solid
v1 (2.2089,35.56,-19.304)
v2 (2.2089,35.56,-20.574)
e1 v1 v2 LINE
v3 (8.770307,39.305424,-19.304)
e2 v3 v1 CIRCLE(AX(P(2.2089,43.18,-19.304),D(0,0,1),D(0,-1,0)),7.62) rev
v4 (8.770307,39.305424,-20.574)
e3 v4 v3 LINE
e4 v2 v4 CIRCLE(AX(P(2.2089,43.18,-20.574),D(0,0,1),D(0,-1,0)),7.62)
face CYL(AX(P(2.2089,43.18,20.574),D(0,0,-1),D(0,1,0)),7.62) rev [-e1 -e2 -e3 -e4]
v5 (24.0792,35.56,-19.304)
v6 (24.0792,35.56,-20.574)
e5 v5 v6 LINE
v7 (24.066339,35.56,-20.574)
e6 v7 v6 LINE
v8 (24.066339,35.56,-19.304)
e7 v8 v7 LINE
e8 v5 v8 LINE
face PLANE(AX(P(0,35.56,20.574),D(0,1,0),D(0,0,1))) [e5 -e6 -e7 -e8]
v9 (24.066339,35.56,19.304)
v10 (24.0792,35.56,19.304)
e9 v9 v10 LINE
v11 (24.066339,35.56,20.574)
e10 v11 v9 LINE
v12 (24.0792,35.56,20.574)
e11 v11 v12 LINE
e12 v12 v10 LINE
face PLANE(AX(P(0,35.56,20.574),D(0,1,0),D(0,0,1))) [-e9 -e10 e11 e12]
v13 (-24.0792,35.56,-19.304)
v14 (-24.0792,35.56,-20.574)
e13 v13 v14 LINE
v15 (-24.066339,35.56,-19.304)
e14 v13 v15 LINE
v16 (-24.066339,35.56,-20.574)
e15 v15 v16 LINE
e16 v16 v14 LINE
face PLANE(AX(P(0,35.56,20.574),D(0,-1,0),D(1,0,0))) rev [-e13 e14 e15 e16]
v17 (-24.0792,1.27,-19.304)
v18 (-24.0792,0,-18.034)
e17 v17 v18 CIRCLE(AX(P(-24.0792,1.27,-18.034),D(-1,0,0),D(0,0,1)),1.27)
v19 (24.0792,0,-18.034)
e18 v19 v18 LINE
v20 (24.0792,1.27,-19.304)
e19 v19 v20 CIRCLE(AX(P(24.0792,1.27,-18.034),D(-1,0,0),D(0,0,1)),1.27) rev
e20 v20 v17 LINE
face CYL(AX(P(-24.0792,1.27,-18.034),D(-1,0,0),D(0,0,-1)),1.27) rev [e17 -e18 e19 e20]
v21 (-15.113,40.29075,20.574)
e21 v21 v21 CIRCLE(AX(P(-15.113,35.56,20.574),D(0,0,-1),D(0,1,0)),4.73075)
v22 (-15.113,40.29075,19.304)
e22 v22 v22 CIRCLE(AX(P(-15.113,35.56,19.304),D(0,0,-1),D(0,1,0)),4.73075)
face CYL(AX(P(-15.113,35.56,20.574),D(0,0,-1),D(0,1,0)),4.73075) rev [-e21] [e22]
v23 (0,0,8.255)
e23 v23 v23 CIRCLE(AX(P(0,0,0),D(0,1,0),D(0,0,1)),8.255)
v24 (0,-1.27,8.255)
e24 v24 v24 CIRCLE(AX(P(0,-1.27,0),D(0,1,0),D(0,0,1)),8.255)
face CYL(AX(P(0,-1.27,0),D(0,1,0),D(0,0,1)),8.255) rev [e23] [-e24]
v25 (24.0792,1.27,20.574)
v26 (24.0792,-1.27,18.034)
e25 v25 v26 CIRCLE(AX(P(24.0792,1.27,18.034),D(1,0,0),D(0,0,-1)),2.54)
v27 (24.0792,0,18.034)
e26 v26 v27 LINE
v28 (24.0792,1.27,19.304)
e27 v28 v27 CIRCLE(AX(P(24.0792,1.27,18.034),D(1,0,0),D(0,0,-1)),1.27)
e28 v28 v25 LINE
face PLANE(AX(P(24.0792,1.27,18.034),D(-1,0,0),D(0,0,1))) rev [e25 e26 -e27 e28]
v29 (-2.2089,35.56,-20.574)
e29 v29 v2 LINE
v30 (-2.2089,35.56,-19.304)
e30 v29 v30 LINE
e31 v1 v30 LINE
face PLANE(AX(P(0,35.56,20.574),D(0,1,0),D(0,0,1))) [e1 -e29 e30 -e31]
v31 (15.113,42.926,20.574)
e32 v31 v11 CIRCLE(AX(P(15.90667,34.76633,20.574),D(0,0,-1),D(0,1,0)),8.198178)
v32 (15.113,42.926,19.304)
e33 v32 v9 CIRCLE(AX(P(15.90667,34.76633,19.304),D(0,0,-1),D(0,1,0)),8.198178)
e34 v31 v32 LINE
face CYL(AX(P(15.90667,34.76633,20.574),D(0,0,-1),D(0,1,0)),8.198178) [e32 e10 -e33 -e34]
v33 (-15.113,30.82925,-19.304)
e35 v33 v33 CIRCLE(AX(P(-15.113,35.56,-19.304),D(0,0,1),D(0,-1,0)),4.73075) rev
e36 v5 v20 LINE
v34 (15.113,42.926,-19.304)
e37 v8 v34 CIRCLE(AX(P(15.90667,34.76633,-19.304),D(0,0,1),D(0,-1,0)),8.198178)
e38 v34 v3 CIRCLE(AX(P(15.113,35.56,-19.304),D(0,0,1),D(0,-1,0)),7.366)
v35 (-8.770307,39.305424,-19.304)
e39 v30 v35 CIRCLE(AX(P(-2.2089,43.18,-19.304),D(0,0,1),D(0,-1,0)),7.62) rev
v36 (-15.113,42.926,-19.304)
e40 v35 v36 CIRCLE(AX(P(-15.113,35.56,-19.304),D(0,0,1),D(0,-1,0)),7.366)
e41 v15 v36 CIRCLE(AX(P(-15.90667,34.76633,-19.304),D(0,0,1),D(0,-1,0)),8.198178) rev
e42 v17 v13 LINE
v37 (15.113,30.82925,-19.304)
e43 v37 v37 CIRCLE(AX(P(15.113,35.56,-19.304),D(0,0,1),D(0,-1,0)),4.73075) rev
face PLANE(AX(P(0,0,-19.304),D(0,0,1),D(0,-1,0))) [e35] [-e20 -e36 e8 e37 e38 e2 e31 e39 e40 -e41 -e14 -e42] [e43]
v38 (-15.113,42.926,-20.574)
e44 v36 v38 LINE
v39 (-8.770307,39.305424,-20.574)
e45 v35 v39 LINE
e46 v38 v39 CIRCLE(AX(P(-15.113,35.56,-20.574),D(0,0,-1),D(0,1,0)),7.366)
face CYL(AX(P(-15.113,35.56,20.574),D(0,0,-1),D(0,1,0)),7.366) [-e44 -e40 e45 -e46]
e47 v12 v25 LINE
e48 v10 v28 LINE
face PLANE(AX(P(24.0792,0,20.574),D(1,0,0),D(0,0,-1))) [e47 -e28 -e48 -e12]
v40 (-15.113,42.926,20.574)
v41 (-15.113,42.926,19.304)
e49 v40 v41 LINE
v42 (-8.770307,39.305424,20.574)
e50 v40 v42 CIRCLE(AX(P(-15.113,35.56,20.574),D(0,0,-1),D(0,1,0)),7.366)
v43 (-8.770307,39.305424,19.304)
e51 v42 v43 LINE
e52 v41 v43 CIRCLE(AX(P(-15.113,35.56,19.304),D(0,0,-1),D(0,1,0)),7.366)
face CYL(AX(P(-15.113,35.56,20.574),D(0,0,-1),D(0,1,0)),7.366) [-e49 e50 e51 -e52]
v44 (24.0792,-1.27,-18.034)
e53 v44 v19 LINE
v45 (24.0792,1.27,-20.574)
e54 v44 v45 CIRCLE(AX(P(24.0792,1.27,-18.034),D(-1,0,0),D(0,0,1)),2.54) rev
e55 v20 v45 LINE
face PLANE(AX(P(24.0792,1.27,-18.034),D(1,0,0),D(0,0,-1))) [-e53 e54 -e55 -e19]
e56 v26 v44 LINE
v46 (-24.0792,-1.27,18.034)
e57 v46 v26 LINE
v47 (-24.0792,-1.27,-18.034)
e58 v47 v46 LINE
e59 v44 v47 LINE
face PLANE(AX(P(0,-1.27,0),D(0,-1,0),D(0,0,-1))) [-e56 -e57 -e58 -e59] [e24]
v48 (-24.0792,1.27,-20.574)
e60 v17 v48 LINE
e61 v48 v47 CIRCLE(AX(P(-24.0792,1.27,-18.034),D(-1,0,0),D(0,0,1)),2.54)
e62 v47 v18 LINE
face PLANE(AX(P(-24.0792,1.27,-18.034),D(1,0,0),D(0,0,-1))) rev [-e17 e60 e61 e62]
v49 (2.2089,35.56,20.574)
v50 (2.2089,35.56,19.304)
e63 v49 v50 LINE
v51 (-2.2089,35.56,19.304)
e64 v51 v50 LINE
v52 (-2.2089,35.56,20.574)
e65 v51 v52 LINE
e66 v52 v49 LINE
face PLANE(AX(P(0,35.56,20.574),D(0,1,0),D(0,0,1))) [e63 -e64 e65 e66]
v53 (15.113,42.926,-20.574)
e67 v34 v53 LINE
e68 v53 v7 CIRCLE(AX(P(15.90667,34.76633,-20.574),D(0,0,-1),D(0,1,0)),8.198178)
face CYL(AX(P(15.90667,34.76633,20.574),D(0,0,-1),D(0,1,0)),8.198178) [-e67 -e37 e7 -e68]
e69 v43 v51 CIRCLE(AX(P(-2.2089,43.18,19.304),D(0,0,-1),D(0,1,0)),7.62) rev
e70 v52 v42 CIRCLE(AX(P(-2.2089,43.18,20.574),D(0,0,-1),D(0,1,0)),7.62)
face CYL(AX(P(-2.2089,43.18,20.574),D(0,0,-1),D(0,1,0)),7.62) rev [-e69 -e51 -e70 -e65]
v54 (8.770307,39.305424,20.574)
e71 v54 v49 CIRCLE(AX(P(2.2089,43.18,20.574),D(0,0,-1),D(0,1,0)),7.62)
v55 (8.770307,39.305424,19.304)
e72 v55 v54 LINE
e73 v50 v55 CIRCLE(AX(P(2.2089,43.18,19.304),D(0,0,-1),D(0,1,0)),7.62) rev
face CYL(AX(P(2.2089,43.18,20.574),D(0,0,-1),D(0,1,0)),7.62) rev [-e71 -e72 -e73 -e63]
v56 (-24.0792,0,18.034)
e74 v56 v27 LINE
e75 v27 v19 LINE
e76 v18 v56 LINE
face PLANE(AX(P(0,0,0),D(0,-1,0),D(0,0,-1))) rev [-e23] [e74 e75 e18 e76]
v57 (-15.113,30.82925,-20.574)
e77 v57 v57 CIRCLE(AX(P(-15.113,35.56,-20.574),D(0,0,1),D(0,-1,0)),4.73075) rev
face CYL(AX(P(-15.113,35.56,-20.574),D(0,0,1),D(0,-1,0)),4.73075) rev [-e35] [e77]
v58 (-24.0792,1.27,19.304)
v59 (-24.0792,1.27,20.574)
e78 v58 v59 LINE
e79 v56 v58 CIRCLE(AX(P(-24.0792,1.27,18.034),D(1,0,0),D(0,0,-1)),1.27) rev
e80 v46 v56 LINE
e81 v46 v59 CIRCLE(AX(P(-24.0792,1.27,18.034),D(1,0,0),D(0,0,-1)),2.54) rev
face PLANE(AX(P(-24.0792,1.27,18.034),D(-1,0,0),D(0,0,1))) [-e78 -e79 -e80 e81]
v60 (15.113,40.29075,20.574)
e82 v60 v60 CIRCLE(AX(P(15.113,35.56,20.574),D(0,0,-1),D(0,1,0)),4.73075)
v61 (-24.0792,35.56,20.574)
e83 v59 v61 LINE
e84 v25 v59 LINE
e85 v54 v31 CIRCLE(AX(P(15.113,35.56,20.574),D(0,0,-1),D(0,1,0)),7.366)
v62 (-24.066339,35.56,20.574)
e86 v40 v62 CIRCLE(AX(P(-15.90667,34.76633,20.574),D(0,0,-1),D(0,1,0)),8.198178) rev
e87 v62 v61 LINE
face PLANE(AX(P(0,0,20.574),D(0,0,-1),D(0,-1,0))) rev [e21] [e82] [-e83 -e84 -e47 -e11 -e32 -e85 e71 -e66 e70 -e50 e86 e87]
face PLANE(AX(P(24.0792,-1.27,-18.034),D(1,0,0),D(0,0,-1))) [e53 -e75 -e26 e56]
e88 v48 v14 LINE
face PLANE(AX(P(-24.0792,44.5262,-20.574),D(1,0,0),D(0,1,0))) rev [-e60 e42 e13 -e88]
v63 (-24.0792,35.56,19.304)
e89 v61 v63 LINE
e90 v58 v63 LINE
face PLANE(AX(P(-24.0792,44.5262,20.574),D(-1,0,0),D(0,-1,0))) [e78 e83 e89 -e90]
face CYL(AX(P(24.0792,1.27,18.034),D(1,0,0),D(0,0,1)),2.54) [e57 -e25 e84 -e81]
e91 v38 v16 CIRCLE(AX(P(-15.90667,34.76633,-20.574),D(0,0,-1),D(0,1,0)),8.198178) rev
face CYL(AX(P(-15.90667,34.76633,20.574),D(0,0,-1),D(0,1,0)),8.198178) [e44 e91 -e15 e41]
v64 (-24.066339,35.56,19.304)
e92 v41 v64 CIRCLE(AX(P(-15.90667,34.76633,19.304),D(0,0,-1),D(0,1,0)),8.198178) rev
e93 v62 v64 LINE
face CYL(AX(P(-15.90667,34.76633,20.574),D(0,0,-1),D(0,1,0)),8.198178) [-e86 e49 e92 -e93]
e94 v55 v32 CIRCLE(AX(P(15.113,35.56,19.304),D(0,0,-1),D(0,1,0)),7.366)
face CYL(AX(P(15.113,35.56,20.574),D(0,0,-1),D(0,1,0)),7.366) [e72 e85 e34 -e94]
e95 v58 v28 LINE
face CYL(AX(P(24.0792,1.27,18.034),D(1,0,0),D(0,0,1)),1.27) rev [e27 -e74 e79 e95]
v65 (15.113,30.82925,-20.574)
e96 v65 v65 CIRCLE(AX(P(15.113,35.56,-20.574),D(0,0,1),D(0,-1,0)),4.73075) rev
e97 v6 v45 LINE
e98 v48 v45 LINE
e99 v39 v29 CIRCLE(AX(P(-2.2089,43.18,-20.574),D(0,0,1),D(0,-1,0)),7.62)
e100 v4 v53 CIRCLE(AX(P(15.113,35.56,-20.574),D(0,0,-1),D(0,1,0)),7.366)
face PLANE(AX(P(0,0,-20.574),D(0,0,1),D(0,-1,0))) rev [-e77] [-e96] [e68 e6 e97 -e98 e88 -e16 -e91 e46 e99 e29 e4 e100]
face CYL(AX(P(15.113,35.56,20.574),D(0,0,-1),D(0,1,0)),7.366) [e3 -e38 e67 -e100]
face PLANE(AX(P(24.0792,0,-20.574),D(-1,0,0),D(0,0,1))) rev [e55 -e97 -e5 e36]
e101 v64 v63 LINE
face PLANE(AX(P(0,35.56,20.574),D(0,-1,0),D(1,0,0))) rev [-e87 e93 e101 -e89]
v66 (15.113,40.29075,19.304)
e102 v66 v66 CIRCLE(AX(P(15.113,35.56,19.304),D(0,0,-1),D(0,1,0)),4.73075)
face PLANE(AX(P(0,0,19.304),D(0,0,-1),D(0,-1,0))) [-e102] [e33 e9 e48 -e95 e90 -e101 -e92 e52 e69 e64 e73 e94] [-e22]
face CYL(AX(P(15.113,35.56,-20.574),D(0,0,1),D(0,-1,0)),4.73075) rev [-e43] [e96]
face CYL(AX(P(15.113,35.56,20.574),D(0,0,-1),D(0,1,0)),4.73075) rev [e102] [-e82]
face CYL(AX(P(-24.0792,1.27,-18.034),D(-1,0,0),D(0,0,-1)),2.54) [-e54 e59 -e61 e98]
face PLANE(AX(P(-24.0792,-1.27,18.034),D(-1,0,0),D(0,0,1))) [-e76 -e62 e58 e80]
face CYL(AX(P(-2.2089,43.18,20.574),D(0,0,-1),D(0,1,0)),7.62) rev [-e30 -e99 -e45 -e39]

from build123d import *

# Parameters (mm, degrees)
SKETCH1_W               = 48.1584
SKETCH1_H               = 36.068
SKETCH1_R               = 8.255
BASE_FLANGE1_DEPTH      = 1.27
EDGE_FLANGE1_DEPTH      = 48.1584
EDGE_FLANGE1_START      = 1.27
EDGE_FLANGE1_PROFILE_W  = 48.1584
EDGE_FLANGE1_PROFILE_H  = 43.2562
EDGE_FLANGE1_PROFILE_R  = 4.73075
EDGE_FLANGE1_FLAT_DEPTH = 1.27
CUT_EXTRUDE7_DEPTH      = 66.234563408
FILLET2_R               = 7.62


# Sheet-metal steps are written as plain solids
with BuildPart() as part:
    # Sketch1 → Base-Flange1 (new body)
    with BuildSketch(Plane(origin=(0, 0, 0), x_dir=(1, 0, 0), z_dir=(0, 1, 0))):
        Rectangle(SKETCH1_W, SKETCH1_H)
        with Locations(Location((0, 0, 0), (0, 0, 270))):
            Circle(SKETCH1_R, mode=Mode.SUBTRACT)
    extrude(amount=-BASE_FLANGE1_DEPTH)

    # Edge-Flange1 bend section (across the edge) → Edge-Flange1 (add)
    with BuildSketch(Plane(origin=(24.0792, 0, -19.304), x_dir=(0, 0, 1), z_dir=(-1, 0, 0))):
        with BuildLine():
            Line((-1.27, 1.27), (0, 1.27))
            ThreePointArc((0, 1.27), (0.371974388, 0.371974388), (1.27, 0))
            Line((1.27, 0), (1.27, -1.27))
            ThreePointArc((1.27, -1.27), (-0.526051224, -0.526051224), (-1.27, 1.27))
        make_face()
    edge_flange1 = extrude(amount=EDGE_FLANGE1_DEPTH)

    # Edge-Flange1 profile (on flange) → Edge-Flange1 flat (add)
    with BuildSketch(Plane(origin=(0, 0, -19.304), x_dir=(-1, 0, 0), z_dir=(0, 0, -1)).offset(EDGE_FLANGE1_START)):
        with Locations((0, 22.8981)):
            Rectangle(EDGE_FLANGE1_PROFILE_W, EDGE_FLANGE1_PROFILE_H)
        with Locations((15.113, 35.56)):
            Circle(EDGE_FLANGE1_PROFILE_R, mode=Mode.SUBTRACT)
        with Locations((-15.113, 35.56)):
            Circle(EDGE_FLANGE1_PROFILE_R, mode=Mode.SUBTRACT)
    edge_flange1_flat = extrude(amount=-EDGE_FLANGE1_FLAT_DEPTH)

    # Mirror1: Edge-Flange1, Edge-Flange1 flat across plane
    add(edge_flange1.mirror(Plane.XY))
    add(edge_flange1_flat.mirror(Plane.XY))

    # Sketch11 → Cut-Extrude7 (cut, through all)
    with BuildSketch(Plane(origin=(0, 0, -20.574), x_dir=(-1, 0, 0), z_dir=(0, 0, -1))):
        with BuildLine():
            Line((24.0792, 35.56), (24.0792, 44.5262))
            Line((24.0792, 44.5262), (-24.0792, 44.5262))
            Line((-24.0792, 44.5262), (-24.0792, 35.56))
            Line((-24.0792, 35.56), (-24.066339002, 35.56))
            ThreePointArc((-24.066339002, 35.56), (-21.115218051, 41.097297222), (-15.113, 42.926))
            ThreePointArc((-15.113, 42.926), (-9.90445145, 40.76854855), (-7.747, 35.56))
            Line((-7.747, 35.56), (7.747, 35.56))
            ThreePointArc((7.747, 35.56), (9.90445145, 40.76854855), (15.113, 42.926))
            ThreePointArc((15.113, 42.926), (21.115218051, 41.097297222), (24.066339002, 35.56))
            Line((24.066339002, 35.56), (24.0792, 35.56))
        make_face()
    extrude(amount=-CUT_EXTRUDE7_DEPTH, mode=Mode.SUBTRACT)

    # Fillet2
    fillet2_edges = [part.edges().sort_by_distance(p)[0] for p in [
        (-7.747, 35.56, -19.939),
        (7.747, 35.56, -19.939),
        (-7.747, 35.56, 19.939),
        (7.747, 35.56, 19.939),
    ]]
    fillet(fillet2_edges, radius=FILLET2_R)


solid = part.part
